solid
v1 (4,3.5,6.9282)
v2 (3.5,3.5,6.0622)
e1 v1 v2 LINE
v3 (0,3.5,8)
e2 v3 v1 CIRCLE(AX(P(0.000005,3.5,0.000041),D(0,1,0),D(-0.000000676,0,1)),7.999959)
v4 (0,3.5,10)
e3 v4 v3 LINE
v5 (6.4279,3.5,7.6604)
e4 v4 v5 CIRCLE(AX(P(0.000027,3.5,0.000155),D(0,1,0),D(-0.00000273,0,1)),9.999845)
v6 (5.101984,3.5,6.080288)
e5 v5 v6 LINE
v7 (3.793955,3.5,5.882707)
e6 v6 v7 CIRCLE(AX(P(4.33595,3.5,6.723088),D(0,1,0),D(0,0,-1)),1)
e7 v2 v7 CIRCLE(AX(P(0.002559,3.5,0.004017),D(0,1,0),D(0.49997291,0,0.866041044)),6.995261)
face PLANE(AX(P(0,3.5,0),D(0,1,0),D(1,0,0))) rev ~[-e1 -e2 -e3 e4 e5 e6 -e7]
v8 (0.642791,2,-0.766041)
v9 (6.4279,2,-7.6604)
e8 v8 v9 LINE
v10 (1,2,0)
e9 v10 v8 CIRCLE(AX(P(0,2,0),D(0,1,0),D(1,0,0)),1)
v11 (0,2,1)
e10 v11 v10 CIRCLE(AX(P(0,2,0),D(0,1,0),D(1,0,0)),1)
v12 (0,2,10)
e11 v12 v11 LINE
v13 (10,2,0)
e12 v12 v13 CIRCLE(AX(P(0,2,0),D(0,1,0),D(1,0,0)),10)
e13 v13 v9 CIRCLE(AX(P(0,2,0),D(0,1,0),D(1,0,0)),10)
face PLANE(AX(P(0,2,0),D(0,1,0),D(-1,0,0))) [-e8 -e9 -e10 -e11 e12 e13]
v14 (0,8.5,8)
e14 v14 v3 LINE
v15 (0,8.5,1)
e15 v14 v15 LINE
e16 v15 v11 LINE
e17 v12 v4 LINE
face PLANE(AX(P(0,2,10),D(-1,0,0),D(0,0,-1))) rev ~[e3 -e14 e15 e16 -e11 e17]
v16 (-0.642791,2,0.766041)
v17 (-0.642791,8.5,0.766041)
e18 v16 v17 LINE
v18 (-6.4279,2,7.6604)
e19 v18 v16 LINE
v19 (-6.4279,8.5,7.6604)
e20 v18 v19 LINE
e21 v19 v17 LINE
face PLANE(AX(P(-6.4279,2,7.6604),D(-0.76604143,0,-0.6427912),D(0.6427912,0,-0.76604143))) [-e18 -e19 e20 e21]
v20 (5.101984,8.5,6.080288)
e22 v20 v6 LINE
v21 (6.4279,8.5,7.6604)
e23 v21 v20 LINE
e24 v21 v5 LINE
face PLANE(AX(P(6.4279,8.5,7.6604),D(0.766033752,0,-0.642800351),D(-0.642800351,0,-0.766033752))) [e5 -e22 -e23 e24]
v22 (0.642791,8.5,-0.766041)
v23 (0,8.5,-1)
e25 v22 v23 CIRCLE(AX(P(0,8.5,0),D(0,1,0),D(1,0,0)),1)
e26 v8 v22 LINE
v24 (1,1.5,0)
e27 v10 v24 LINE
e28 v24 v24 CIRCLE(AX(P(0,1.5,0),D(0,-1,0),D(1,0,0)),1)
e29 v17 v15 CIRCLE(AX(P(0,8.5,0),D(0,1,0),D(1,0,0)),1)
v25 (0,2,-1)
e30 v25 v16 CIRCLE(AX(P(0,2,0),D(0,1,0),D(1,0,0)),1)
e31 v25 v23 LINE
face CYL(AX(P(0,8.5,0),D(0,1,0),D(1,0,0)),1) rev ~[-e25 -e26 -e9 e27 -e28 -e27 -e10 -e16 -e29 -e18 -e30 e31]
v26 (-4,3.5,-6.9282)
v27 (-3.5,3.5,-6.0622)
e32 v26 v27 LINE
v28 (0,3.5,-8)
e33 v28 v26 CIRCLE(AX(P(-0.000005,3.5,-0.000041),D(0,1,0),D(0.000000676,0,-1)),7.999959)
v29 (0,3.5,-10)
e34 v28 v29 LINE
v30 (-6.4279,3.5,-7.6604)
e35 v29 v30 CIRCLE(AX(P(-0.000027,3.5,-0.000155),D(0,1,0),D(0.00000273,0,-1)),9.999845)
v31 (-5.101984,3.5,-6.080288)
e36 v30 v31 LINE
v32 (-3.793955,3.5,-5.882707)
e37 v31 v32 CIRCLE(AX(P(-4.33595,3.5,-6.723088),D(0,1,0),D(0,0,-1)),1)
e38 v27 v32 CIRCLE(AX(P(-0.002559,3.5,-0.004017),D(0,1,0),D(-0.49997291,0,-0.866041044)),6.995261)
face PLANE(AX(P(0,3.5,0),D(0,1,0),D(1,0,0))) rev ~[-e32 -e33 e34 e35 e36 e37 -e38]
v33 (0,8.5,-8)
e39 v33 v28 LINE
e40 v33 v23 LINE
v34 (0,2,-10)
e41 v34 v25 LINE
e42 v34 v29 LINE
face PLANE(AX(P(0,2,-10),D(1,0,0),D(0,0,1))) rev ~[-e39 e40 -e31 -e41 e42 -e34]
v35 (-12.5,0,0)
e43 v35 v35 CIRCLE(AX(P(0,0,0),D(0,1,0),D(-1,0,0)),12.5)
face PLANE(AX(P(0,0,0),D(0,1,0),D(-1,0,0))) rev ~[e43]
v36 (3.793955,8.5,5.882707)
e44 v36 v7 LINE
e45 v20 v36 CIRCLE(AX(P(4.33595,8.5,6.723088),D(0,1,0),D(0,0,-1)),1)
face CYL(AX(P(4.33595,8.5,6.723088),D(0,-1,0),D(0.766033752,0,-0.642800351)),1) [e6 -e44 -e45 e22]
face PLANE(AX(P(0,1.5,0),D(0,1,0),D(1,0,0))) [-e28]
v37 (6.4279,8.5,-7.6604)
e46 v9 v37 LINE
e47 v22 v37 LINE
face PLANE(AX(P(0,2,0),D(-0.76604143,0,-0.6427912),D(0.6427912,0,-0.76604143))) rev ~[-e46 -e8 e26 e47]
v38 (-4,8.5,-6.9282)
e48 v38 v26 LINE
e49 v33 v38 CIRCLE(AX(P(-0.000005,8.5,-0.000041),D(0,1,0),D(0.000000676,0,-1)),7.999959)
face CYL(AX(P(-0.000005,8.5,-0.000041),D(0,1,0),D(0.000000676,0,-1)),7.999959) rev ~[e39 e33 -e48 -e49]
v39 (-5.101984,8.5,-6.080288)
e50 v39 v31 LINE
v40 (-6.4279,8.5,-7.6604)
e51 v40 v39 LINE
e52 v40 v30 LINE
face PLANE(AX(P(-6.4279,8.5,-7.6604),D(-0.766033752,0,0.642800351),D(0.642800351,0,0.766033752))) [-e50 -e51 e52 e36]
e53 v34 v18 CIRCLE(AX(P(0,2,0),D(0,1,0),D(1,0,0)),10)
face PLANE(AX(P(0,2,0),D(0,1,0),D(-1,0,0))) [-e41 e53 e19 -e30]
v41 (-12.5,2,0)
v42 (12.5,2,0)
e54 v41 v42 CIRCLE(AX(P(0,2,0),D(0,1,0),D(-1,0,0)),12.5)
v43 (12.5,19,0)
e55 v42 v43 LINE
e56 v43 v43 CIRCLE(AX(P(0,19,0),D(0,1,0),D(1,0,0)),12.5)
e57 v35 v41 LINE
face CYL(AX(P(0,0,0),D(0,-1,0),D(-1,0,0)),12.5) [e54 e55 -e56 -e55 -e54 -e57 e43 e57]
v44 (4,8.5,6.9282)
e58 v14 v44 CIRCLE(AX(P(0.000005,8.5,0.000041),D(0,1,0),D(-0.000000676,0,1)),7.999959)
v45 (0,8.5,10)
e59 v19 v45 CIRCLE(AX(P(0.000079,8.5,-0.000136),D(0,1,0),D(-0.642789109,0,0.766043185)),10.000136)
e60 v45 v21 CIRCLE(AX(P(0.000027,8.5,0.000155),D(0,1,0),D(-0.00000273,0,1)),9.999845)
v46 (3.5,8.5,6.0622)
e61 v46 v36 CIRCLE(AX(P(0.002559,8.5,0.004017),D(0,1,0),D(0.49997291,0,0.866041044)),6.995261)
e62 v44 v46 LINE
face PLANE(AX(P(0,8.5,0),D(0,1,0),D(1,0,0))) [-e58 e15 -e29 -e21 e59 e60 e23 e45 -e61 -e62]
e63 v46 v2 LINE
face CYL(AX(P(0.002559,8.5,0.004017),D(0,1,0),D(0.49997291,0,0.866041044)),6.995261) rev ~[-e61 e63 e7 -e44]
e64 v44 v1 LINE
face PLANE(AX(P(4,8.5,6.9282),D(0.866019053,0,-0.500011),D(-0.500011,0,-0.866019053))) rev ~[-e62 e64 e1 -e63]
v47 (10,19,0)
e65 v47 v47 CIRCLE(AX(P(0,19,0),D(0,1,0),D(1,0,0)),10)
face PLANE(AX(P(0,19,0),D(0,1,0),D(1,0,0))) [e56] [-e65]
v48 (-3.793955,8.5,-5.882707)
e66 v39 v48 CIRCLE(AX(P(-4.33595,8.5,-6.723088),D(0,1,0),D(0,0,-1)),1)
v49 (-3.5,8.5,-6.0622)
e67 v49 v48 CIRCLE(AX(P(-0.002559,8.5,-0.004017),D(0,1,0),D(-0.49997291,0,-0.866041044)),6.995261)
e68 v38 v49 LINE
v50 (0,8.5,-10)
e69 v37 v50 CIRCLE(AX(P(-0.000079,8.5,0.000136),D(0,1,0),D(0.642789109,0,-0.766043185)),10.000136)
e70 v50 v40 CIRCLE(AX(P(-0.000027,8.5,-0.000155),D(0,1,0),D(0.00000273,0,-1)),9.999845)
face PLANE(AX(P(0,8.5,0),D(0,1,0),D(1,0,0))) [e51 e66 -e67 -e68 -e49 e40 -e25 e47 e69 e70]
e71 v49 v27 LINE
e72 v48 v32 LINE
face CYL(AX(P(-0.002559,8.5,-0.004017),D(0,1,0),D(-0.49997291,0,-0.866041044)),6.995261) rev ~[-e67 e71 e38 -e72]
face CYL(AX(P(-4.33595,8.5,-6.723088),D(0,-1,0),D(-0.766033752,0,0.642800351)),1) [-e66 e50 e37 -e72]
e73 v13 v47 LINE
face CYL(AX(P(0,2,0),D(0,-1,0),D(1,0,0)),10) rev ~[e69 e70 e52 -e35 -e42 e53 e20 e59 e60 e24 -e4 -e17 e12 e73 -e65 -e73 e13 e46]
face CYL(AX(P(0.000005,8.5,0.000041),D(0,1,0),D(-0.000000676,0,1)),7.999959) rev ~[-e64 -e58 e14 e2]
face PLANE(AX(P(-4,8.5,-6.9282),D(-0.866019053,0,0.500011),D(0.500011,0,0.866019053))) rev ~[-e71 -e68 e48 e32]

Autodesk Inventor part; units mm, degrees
ref_plane "YZ Plane" through (0, 0, 0) normal (1, 0, 0) x (0, 1, 0)
ref_plane "XZ Plane" through (0, 0, 0) normal (0, 1, 0) x (-1, 0, 0)
ref_plane "XY Plane" through (0, 0, 0) normal (0, 0, 1) x (1, 0, 0)
sketch "スケッチ1" plane through (0, 0, 0) normal (0, 1, 0) x (-1, 0, 0)
  circle A0 centre (0, 0) radius 12.5
  dimension "d0" = 25
extrude "押し出し1" add sketch "スケッチ1" along normal blind 2
sketch "スケッチ2" plane through (0, 2, 0) normal (0, 1, 0) x (1, 0, 0)
  circle A0 centre (0, 0) radius 12.5
  circle A1 centre (0, 0) radius 10
  dimension "d3" = 25
  dimension "d4" = 20
extrude "押し出し2" add sketch "スケッチ2" along normal blind 17
sketch "スケッチ3" plane through (0, 2, 0) normal (0, 1, 0) x (1, 0, 0)
  arc A0 (-6.4279, -7.6604) -> (0, -10) centre (0, 0) ccw
  line L0 (0, 0) -> (-6.4279, -7.6604) construction
  line L1 (0, 0) -> (0, -10) construction
  arc A1 (6.4279, 7.6604) -> (0, 10) centre (0, 0) ccw
  line L2 (0, 0) -> (6.4279, 7.6604) construction
  line L3 (0, 0) -> (0, 10) construction
  circle A2 centre (0, 0) radius 10 projected
  line L4 (-6.4279, -7.6604) -> (0, 0)
  line L5 (0, 0) -> (6.4279, 7.6604)
  line L6 (0, -10) -> (0, 0)
  line L7 (0, 10) -> (0, 0)
  circle A3 centre (0, 0) radius 10 projected
  point P0 (3.2139, 3.8302)
  dimension "d8" = 40
  dimension "d10" = 40
  dimension "d11" = 3.8302
  dimension "d12" = 6.4279
extrude "押し出し3" add sketch "スケッチ3" along normal blind 6.5 contours L4 L6 A0 | A1 L5 L7
sketch "スケッチ4" plane through (0, 8.5, 0) normal (0, 1, 0) x (1, 0, 0)
  line L0 (0, -10) -> (0, 0) projected
  circle A0 centre (0, 0) radius 1
  dimension "d15" = 2
extrude "押し出し4" cut sketch "スケッチ4" against normal blind 7
ref_plane "作業平面1" through (0, 9, 0) normal (0, 1, 0) x (1, 0, 0)
sketch "スケッチ5" plane through (0, 8.5, 0) normal (0, 1, 0) x (1, 0, 0)
  line L0 (0, -10) -> (0, -1) projected
  arc A0 (0, -10) -> (6.4279, -7.6604) centre (0, 0) ccw
  line L1 (0, 0) -> (6.4279, -7.6604) construction
  line L2 (0, 0) -> (0, -10) construction
  arc A1 (0, -8) -> (4, -6.9282) centre (0, 0) ccw
  line L3 (0, 0) -> (4, -6.9282) construction
  line L4 (0, 0) -> (0, -8) construction
  arc A2 (3.5, -6.0622) -> (4.4995, -5.3623) centre (0, 0) ccw
  line L5 (0, 0) -> (4.4995, -5.3623) construction
  line L6 (0, 0) -> (3.5, -6.0622) construction
  arc A3 (0, -10) -> (6.4279, 7.6604) centre (0, 0) ccw projected
  line L7 (0, -10) -> (0, -8)
  line L8 (6.4279, -7.6604) -> (4.4995, -5.3623)
  line L9 (4, -6.9282) -> (3.5, -6.0622)
  line L10 (0, 1) -> (0, 10) projected
  arc A4 (0, 10) -> (-6.4279, 7.6604) centre (0, 0) ccw
  line L11 (0, 0) -> (-6.4279, 7.6604) construction
  line L12 (0, 0) -> (0, 10) construction
  arc A5 (0, 8) -> (-4, 6.9282) centre (0, 0) ccw
  line L13 (0, 0) -> (-4, 6.9282) construction
  line L14 (0, 0) -> (0, 8) construction
  arc A6 (-3.5, 6.0622) -> (-4.4995, 5.3623) centre (0, 0) ccw
  line L15 (0, 0) -> (-3.5, 6.0622) construction
  line L16 (0, 0) -> (-4.4995, 5.3623) construction
  line L17 (-6.4279, 7.6604) -> (-4.4995, 5.3623)
  line L18 (-4, 6.9282) -> (-3.5, 6.0622)
  line L19 (0, 10) -> (0, 8)
  dimension "d19" = 10
  dimension "d20" = 40
  dimension "d21" = 8
  dimension "d22" = 30
  dimension "d23" = 7
  dimension "d24" = 10
  dimension "d25" = 10
  dimension "d26" = 40
  dimension "d27" = 8
  dimension "d28" = 30
  dimension "d29" = 7
  dimension "d30" = 10
extrude "押し出し5" add sketch "スケッチ5" against normal blind 5
fillet "フィレット1" radius 1 1 edges at (-4.4995, 6, -5.3623)
fillet "フィレット2" radius 1 1 edges at (4.4995, 6, 5.3623)
properties part number "kumi2"
